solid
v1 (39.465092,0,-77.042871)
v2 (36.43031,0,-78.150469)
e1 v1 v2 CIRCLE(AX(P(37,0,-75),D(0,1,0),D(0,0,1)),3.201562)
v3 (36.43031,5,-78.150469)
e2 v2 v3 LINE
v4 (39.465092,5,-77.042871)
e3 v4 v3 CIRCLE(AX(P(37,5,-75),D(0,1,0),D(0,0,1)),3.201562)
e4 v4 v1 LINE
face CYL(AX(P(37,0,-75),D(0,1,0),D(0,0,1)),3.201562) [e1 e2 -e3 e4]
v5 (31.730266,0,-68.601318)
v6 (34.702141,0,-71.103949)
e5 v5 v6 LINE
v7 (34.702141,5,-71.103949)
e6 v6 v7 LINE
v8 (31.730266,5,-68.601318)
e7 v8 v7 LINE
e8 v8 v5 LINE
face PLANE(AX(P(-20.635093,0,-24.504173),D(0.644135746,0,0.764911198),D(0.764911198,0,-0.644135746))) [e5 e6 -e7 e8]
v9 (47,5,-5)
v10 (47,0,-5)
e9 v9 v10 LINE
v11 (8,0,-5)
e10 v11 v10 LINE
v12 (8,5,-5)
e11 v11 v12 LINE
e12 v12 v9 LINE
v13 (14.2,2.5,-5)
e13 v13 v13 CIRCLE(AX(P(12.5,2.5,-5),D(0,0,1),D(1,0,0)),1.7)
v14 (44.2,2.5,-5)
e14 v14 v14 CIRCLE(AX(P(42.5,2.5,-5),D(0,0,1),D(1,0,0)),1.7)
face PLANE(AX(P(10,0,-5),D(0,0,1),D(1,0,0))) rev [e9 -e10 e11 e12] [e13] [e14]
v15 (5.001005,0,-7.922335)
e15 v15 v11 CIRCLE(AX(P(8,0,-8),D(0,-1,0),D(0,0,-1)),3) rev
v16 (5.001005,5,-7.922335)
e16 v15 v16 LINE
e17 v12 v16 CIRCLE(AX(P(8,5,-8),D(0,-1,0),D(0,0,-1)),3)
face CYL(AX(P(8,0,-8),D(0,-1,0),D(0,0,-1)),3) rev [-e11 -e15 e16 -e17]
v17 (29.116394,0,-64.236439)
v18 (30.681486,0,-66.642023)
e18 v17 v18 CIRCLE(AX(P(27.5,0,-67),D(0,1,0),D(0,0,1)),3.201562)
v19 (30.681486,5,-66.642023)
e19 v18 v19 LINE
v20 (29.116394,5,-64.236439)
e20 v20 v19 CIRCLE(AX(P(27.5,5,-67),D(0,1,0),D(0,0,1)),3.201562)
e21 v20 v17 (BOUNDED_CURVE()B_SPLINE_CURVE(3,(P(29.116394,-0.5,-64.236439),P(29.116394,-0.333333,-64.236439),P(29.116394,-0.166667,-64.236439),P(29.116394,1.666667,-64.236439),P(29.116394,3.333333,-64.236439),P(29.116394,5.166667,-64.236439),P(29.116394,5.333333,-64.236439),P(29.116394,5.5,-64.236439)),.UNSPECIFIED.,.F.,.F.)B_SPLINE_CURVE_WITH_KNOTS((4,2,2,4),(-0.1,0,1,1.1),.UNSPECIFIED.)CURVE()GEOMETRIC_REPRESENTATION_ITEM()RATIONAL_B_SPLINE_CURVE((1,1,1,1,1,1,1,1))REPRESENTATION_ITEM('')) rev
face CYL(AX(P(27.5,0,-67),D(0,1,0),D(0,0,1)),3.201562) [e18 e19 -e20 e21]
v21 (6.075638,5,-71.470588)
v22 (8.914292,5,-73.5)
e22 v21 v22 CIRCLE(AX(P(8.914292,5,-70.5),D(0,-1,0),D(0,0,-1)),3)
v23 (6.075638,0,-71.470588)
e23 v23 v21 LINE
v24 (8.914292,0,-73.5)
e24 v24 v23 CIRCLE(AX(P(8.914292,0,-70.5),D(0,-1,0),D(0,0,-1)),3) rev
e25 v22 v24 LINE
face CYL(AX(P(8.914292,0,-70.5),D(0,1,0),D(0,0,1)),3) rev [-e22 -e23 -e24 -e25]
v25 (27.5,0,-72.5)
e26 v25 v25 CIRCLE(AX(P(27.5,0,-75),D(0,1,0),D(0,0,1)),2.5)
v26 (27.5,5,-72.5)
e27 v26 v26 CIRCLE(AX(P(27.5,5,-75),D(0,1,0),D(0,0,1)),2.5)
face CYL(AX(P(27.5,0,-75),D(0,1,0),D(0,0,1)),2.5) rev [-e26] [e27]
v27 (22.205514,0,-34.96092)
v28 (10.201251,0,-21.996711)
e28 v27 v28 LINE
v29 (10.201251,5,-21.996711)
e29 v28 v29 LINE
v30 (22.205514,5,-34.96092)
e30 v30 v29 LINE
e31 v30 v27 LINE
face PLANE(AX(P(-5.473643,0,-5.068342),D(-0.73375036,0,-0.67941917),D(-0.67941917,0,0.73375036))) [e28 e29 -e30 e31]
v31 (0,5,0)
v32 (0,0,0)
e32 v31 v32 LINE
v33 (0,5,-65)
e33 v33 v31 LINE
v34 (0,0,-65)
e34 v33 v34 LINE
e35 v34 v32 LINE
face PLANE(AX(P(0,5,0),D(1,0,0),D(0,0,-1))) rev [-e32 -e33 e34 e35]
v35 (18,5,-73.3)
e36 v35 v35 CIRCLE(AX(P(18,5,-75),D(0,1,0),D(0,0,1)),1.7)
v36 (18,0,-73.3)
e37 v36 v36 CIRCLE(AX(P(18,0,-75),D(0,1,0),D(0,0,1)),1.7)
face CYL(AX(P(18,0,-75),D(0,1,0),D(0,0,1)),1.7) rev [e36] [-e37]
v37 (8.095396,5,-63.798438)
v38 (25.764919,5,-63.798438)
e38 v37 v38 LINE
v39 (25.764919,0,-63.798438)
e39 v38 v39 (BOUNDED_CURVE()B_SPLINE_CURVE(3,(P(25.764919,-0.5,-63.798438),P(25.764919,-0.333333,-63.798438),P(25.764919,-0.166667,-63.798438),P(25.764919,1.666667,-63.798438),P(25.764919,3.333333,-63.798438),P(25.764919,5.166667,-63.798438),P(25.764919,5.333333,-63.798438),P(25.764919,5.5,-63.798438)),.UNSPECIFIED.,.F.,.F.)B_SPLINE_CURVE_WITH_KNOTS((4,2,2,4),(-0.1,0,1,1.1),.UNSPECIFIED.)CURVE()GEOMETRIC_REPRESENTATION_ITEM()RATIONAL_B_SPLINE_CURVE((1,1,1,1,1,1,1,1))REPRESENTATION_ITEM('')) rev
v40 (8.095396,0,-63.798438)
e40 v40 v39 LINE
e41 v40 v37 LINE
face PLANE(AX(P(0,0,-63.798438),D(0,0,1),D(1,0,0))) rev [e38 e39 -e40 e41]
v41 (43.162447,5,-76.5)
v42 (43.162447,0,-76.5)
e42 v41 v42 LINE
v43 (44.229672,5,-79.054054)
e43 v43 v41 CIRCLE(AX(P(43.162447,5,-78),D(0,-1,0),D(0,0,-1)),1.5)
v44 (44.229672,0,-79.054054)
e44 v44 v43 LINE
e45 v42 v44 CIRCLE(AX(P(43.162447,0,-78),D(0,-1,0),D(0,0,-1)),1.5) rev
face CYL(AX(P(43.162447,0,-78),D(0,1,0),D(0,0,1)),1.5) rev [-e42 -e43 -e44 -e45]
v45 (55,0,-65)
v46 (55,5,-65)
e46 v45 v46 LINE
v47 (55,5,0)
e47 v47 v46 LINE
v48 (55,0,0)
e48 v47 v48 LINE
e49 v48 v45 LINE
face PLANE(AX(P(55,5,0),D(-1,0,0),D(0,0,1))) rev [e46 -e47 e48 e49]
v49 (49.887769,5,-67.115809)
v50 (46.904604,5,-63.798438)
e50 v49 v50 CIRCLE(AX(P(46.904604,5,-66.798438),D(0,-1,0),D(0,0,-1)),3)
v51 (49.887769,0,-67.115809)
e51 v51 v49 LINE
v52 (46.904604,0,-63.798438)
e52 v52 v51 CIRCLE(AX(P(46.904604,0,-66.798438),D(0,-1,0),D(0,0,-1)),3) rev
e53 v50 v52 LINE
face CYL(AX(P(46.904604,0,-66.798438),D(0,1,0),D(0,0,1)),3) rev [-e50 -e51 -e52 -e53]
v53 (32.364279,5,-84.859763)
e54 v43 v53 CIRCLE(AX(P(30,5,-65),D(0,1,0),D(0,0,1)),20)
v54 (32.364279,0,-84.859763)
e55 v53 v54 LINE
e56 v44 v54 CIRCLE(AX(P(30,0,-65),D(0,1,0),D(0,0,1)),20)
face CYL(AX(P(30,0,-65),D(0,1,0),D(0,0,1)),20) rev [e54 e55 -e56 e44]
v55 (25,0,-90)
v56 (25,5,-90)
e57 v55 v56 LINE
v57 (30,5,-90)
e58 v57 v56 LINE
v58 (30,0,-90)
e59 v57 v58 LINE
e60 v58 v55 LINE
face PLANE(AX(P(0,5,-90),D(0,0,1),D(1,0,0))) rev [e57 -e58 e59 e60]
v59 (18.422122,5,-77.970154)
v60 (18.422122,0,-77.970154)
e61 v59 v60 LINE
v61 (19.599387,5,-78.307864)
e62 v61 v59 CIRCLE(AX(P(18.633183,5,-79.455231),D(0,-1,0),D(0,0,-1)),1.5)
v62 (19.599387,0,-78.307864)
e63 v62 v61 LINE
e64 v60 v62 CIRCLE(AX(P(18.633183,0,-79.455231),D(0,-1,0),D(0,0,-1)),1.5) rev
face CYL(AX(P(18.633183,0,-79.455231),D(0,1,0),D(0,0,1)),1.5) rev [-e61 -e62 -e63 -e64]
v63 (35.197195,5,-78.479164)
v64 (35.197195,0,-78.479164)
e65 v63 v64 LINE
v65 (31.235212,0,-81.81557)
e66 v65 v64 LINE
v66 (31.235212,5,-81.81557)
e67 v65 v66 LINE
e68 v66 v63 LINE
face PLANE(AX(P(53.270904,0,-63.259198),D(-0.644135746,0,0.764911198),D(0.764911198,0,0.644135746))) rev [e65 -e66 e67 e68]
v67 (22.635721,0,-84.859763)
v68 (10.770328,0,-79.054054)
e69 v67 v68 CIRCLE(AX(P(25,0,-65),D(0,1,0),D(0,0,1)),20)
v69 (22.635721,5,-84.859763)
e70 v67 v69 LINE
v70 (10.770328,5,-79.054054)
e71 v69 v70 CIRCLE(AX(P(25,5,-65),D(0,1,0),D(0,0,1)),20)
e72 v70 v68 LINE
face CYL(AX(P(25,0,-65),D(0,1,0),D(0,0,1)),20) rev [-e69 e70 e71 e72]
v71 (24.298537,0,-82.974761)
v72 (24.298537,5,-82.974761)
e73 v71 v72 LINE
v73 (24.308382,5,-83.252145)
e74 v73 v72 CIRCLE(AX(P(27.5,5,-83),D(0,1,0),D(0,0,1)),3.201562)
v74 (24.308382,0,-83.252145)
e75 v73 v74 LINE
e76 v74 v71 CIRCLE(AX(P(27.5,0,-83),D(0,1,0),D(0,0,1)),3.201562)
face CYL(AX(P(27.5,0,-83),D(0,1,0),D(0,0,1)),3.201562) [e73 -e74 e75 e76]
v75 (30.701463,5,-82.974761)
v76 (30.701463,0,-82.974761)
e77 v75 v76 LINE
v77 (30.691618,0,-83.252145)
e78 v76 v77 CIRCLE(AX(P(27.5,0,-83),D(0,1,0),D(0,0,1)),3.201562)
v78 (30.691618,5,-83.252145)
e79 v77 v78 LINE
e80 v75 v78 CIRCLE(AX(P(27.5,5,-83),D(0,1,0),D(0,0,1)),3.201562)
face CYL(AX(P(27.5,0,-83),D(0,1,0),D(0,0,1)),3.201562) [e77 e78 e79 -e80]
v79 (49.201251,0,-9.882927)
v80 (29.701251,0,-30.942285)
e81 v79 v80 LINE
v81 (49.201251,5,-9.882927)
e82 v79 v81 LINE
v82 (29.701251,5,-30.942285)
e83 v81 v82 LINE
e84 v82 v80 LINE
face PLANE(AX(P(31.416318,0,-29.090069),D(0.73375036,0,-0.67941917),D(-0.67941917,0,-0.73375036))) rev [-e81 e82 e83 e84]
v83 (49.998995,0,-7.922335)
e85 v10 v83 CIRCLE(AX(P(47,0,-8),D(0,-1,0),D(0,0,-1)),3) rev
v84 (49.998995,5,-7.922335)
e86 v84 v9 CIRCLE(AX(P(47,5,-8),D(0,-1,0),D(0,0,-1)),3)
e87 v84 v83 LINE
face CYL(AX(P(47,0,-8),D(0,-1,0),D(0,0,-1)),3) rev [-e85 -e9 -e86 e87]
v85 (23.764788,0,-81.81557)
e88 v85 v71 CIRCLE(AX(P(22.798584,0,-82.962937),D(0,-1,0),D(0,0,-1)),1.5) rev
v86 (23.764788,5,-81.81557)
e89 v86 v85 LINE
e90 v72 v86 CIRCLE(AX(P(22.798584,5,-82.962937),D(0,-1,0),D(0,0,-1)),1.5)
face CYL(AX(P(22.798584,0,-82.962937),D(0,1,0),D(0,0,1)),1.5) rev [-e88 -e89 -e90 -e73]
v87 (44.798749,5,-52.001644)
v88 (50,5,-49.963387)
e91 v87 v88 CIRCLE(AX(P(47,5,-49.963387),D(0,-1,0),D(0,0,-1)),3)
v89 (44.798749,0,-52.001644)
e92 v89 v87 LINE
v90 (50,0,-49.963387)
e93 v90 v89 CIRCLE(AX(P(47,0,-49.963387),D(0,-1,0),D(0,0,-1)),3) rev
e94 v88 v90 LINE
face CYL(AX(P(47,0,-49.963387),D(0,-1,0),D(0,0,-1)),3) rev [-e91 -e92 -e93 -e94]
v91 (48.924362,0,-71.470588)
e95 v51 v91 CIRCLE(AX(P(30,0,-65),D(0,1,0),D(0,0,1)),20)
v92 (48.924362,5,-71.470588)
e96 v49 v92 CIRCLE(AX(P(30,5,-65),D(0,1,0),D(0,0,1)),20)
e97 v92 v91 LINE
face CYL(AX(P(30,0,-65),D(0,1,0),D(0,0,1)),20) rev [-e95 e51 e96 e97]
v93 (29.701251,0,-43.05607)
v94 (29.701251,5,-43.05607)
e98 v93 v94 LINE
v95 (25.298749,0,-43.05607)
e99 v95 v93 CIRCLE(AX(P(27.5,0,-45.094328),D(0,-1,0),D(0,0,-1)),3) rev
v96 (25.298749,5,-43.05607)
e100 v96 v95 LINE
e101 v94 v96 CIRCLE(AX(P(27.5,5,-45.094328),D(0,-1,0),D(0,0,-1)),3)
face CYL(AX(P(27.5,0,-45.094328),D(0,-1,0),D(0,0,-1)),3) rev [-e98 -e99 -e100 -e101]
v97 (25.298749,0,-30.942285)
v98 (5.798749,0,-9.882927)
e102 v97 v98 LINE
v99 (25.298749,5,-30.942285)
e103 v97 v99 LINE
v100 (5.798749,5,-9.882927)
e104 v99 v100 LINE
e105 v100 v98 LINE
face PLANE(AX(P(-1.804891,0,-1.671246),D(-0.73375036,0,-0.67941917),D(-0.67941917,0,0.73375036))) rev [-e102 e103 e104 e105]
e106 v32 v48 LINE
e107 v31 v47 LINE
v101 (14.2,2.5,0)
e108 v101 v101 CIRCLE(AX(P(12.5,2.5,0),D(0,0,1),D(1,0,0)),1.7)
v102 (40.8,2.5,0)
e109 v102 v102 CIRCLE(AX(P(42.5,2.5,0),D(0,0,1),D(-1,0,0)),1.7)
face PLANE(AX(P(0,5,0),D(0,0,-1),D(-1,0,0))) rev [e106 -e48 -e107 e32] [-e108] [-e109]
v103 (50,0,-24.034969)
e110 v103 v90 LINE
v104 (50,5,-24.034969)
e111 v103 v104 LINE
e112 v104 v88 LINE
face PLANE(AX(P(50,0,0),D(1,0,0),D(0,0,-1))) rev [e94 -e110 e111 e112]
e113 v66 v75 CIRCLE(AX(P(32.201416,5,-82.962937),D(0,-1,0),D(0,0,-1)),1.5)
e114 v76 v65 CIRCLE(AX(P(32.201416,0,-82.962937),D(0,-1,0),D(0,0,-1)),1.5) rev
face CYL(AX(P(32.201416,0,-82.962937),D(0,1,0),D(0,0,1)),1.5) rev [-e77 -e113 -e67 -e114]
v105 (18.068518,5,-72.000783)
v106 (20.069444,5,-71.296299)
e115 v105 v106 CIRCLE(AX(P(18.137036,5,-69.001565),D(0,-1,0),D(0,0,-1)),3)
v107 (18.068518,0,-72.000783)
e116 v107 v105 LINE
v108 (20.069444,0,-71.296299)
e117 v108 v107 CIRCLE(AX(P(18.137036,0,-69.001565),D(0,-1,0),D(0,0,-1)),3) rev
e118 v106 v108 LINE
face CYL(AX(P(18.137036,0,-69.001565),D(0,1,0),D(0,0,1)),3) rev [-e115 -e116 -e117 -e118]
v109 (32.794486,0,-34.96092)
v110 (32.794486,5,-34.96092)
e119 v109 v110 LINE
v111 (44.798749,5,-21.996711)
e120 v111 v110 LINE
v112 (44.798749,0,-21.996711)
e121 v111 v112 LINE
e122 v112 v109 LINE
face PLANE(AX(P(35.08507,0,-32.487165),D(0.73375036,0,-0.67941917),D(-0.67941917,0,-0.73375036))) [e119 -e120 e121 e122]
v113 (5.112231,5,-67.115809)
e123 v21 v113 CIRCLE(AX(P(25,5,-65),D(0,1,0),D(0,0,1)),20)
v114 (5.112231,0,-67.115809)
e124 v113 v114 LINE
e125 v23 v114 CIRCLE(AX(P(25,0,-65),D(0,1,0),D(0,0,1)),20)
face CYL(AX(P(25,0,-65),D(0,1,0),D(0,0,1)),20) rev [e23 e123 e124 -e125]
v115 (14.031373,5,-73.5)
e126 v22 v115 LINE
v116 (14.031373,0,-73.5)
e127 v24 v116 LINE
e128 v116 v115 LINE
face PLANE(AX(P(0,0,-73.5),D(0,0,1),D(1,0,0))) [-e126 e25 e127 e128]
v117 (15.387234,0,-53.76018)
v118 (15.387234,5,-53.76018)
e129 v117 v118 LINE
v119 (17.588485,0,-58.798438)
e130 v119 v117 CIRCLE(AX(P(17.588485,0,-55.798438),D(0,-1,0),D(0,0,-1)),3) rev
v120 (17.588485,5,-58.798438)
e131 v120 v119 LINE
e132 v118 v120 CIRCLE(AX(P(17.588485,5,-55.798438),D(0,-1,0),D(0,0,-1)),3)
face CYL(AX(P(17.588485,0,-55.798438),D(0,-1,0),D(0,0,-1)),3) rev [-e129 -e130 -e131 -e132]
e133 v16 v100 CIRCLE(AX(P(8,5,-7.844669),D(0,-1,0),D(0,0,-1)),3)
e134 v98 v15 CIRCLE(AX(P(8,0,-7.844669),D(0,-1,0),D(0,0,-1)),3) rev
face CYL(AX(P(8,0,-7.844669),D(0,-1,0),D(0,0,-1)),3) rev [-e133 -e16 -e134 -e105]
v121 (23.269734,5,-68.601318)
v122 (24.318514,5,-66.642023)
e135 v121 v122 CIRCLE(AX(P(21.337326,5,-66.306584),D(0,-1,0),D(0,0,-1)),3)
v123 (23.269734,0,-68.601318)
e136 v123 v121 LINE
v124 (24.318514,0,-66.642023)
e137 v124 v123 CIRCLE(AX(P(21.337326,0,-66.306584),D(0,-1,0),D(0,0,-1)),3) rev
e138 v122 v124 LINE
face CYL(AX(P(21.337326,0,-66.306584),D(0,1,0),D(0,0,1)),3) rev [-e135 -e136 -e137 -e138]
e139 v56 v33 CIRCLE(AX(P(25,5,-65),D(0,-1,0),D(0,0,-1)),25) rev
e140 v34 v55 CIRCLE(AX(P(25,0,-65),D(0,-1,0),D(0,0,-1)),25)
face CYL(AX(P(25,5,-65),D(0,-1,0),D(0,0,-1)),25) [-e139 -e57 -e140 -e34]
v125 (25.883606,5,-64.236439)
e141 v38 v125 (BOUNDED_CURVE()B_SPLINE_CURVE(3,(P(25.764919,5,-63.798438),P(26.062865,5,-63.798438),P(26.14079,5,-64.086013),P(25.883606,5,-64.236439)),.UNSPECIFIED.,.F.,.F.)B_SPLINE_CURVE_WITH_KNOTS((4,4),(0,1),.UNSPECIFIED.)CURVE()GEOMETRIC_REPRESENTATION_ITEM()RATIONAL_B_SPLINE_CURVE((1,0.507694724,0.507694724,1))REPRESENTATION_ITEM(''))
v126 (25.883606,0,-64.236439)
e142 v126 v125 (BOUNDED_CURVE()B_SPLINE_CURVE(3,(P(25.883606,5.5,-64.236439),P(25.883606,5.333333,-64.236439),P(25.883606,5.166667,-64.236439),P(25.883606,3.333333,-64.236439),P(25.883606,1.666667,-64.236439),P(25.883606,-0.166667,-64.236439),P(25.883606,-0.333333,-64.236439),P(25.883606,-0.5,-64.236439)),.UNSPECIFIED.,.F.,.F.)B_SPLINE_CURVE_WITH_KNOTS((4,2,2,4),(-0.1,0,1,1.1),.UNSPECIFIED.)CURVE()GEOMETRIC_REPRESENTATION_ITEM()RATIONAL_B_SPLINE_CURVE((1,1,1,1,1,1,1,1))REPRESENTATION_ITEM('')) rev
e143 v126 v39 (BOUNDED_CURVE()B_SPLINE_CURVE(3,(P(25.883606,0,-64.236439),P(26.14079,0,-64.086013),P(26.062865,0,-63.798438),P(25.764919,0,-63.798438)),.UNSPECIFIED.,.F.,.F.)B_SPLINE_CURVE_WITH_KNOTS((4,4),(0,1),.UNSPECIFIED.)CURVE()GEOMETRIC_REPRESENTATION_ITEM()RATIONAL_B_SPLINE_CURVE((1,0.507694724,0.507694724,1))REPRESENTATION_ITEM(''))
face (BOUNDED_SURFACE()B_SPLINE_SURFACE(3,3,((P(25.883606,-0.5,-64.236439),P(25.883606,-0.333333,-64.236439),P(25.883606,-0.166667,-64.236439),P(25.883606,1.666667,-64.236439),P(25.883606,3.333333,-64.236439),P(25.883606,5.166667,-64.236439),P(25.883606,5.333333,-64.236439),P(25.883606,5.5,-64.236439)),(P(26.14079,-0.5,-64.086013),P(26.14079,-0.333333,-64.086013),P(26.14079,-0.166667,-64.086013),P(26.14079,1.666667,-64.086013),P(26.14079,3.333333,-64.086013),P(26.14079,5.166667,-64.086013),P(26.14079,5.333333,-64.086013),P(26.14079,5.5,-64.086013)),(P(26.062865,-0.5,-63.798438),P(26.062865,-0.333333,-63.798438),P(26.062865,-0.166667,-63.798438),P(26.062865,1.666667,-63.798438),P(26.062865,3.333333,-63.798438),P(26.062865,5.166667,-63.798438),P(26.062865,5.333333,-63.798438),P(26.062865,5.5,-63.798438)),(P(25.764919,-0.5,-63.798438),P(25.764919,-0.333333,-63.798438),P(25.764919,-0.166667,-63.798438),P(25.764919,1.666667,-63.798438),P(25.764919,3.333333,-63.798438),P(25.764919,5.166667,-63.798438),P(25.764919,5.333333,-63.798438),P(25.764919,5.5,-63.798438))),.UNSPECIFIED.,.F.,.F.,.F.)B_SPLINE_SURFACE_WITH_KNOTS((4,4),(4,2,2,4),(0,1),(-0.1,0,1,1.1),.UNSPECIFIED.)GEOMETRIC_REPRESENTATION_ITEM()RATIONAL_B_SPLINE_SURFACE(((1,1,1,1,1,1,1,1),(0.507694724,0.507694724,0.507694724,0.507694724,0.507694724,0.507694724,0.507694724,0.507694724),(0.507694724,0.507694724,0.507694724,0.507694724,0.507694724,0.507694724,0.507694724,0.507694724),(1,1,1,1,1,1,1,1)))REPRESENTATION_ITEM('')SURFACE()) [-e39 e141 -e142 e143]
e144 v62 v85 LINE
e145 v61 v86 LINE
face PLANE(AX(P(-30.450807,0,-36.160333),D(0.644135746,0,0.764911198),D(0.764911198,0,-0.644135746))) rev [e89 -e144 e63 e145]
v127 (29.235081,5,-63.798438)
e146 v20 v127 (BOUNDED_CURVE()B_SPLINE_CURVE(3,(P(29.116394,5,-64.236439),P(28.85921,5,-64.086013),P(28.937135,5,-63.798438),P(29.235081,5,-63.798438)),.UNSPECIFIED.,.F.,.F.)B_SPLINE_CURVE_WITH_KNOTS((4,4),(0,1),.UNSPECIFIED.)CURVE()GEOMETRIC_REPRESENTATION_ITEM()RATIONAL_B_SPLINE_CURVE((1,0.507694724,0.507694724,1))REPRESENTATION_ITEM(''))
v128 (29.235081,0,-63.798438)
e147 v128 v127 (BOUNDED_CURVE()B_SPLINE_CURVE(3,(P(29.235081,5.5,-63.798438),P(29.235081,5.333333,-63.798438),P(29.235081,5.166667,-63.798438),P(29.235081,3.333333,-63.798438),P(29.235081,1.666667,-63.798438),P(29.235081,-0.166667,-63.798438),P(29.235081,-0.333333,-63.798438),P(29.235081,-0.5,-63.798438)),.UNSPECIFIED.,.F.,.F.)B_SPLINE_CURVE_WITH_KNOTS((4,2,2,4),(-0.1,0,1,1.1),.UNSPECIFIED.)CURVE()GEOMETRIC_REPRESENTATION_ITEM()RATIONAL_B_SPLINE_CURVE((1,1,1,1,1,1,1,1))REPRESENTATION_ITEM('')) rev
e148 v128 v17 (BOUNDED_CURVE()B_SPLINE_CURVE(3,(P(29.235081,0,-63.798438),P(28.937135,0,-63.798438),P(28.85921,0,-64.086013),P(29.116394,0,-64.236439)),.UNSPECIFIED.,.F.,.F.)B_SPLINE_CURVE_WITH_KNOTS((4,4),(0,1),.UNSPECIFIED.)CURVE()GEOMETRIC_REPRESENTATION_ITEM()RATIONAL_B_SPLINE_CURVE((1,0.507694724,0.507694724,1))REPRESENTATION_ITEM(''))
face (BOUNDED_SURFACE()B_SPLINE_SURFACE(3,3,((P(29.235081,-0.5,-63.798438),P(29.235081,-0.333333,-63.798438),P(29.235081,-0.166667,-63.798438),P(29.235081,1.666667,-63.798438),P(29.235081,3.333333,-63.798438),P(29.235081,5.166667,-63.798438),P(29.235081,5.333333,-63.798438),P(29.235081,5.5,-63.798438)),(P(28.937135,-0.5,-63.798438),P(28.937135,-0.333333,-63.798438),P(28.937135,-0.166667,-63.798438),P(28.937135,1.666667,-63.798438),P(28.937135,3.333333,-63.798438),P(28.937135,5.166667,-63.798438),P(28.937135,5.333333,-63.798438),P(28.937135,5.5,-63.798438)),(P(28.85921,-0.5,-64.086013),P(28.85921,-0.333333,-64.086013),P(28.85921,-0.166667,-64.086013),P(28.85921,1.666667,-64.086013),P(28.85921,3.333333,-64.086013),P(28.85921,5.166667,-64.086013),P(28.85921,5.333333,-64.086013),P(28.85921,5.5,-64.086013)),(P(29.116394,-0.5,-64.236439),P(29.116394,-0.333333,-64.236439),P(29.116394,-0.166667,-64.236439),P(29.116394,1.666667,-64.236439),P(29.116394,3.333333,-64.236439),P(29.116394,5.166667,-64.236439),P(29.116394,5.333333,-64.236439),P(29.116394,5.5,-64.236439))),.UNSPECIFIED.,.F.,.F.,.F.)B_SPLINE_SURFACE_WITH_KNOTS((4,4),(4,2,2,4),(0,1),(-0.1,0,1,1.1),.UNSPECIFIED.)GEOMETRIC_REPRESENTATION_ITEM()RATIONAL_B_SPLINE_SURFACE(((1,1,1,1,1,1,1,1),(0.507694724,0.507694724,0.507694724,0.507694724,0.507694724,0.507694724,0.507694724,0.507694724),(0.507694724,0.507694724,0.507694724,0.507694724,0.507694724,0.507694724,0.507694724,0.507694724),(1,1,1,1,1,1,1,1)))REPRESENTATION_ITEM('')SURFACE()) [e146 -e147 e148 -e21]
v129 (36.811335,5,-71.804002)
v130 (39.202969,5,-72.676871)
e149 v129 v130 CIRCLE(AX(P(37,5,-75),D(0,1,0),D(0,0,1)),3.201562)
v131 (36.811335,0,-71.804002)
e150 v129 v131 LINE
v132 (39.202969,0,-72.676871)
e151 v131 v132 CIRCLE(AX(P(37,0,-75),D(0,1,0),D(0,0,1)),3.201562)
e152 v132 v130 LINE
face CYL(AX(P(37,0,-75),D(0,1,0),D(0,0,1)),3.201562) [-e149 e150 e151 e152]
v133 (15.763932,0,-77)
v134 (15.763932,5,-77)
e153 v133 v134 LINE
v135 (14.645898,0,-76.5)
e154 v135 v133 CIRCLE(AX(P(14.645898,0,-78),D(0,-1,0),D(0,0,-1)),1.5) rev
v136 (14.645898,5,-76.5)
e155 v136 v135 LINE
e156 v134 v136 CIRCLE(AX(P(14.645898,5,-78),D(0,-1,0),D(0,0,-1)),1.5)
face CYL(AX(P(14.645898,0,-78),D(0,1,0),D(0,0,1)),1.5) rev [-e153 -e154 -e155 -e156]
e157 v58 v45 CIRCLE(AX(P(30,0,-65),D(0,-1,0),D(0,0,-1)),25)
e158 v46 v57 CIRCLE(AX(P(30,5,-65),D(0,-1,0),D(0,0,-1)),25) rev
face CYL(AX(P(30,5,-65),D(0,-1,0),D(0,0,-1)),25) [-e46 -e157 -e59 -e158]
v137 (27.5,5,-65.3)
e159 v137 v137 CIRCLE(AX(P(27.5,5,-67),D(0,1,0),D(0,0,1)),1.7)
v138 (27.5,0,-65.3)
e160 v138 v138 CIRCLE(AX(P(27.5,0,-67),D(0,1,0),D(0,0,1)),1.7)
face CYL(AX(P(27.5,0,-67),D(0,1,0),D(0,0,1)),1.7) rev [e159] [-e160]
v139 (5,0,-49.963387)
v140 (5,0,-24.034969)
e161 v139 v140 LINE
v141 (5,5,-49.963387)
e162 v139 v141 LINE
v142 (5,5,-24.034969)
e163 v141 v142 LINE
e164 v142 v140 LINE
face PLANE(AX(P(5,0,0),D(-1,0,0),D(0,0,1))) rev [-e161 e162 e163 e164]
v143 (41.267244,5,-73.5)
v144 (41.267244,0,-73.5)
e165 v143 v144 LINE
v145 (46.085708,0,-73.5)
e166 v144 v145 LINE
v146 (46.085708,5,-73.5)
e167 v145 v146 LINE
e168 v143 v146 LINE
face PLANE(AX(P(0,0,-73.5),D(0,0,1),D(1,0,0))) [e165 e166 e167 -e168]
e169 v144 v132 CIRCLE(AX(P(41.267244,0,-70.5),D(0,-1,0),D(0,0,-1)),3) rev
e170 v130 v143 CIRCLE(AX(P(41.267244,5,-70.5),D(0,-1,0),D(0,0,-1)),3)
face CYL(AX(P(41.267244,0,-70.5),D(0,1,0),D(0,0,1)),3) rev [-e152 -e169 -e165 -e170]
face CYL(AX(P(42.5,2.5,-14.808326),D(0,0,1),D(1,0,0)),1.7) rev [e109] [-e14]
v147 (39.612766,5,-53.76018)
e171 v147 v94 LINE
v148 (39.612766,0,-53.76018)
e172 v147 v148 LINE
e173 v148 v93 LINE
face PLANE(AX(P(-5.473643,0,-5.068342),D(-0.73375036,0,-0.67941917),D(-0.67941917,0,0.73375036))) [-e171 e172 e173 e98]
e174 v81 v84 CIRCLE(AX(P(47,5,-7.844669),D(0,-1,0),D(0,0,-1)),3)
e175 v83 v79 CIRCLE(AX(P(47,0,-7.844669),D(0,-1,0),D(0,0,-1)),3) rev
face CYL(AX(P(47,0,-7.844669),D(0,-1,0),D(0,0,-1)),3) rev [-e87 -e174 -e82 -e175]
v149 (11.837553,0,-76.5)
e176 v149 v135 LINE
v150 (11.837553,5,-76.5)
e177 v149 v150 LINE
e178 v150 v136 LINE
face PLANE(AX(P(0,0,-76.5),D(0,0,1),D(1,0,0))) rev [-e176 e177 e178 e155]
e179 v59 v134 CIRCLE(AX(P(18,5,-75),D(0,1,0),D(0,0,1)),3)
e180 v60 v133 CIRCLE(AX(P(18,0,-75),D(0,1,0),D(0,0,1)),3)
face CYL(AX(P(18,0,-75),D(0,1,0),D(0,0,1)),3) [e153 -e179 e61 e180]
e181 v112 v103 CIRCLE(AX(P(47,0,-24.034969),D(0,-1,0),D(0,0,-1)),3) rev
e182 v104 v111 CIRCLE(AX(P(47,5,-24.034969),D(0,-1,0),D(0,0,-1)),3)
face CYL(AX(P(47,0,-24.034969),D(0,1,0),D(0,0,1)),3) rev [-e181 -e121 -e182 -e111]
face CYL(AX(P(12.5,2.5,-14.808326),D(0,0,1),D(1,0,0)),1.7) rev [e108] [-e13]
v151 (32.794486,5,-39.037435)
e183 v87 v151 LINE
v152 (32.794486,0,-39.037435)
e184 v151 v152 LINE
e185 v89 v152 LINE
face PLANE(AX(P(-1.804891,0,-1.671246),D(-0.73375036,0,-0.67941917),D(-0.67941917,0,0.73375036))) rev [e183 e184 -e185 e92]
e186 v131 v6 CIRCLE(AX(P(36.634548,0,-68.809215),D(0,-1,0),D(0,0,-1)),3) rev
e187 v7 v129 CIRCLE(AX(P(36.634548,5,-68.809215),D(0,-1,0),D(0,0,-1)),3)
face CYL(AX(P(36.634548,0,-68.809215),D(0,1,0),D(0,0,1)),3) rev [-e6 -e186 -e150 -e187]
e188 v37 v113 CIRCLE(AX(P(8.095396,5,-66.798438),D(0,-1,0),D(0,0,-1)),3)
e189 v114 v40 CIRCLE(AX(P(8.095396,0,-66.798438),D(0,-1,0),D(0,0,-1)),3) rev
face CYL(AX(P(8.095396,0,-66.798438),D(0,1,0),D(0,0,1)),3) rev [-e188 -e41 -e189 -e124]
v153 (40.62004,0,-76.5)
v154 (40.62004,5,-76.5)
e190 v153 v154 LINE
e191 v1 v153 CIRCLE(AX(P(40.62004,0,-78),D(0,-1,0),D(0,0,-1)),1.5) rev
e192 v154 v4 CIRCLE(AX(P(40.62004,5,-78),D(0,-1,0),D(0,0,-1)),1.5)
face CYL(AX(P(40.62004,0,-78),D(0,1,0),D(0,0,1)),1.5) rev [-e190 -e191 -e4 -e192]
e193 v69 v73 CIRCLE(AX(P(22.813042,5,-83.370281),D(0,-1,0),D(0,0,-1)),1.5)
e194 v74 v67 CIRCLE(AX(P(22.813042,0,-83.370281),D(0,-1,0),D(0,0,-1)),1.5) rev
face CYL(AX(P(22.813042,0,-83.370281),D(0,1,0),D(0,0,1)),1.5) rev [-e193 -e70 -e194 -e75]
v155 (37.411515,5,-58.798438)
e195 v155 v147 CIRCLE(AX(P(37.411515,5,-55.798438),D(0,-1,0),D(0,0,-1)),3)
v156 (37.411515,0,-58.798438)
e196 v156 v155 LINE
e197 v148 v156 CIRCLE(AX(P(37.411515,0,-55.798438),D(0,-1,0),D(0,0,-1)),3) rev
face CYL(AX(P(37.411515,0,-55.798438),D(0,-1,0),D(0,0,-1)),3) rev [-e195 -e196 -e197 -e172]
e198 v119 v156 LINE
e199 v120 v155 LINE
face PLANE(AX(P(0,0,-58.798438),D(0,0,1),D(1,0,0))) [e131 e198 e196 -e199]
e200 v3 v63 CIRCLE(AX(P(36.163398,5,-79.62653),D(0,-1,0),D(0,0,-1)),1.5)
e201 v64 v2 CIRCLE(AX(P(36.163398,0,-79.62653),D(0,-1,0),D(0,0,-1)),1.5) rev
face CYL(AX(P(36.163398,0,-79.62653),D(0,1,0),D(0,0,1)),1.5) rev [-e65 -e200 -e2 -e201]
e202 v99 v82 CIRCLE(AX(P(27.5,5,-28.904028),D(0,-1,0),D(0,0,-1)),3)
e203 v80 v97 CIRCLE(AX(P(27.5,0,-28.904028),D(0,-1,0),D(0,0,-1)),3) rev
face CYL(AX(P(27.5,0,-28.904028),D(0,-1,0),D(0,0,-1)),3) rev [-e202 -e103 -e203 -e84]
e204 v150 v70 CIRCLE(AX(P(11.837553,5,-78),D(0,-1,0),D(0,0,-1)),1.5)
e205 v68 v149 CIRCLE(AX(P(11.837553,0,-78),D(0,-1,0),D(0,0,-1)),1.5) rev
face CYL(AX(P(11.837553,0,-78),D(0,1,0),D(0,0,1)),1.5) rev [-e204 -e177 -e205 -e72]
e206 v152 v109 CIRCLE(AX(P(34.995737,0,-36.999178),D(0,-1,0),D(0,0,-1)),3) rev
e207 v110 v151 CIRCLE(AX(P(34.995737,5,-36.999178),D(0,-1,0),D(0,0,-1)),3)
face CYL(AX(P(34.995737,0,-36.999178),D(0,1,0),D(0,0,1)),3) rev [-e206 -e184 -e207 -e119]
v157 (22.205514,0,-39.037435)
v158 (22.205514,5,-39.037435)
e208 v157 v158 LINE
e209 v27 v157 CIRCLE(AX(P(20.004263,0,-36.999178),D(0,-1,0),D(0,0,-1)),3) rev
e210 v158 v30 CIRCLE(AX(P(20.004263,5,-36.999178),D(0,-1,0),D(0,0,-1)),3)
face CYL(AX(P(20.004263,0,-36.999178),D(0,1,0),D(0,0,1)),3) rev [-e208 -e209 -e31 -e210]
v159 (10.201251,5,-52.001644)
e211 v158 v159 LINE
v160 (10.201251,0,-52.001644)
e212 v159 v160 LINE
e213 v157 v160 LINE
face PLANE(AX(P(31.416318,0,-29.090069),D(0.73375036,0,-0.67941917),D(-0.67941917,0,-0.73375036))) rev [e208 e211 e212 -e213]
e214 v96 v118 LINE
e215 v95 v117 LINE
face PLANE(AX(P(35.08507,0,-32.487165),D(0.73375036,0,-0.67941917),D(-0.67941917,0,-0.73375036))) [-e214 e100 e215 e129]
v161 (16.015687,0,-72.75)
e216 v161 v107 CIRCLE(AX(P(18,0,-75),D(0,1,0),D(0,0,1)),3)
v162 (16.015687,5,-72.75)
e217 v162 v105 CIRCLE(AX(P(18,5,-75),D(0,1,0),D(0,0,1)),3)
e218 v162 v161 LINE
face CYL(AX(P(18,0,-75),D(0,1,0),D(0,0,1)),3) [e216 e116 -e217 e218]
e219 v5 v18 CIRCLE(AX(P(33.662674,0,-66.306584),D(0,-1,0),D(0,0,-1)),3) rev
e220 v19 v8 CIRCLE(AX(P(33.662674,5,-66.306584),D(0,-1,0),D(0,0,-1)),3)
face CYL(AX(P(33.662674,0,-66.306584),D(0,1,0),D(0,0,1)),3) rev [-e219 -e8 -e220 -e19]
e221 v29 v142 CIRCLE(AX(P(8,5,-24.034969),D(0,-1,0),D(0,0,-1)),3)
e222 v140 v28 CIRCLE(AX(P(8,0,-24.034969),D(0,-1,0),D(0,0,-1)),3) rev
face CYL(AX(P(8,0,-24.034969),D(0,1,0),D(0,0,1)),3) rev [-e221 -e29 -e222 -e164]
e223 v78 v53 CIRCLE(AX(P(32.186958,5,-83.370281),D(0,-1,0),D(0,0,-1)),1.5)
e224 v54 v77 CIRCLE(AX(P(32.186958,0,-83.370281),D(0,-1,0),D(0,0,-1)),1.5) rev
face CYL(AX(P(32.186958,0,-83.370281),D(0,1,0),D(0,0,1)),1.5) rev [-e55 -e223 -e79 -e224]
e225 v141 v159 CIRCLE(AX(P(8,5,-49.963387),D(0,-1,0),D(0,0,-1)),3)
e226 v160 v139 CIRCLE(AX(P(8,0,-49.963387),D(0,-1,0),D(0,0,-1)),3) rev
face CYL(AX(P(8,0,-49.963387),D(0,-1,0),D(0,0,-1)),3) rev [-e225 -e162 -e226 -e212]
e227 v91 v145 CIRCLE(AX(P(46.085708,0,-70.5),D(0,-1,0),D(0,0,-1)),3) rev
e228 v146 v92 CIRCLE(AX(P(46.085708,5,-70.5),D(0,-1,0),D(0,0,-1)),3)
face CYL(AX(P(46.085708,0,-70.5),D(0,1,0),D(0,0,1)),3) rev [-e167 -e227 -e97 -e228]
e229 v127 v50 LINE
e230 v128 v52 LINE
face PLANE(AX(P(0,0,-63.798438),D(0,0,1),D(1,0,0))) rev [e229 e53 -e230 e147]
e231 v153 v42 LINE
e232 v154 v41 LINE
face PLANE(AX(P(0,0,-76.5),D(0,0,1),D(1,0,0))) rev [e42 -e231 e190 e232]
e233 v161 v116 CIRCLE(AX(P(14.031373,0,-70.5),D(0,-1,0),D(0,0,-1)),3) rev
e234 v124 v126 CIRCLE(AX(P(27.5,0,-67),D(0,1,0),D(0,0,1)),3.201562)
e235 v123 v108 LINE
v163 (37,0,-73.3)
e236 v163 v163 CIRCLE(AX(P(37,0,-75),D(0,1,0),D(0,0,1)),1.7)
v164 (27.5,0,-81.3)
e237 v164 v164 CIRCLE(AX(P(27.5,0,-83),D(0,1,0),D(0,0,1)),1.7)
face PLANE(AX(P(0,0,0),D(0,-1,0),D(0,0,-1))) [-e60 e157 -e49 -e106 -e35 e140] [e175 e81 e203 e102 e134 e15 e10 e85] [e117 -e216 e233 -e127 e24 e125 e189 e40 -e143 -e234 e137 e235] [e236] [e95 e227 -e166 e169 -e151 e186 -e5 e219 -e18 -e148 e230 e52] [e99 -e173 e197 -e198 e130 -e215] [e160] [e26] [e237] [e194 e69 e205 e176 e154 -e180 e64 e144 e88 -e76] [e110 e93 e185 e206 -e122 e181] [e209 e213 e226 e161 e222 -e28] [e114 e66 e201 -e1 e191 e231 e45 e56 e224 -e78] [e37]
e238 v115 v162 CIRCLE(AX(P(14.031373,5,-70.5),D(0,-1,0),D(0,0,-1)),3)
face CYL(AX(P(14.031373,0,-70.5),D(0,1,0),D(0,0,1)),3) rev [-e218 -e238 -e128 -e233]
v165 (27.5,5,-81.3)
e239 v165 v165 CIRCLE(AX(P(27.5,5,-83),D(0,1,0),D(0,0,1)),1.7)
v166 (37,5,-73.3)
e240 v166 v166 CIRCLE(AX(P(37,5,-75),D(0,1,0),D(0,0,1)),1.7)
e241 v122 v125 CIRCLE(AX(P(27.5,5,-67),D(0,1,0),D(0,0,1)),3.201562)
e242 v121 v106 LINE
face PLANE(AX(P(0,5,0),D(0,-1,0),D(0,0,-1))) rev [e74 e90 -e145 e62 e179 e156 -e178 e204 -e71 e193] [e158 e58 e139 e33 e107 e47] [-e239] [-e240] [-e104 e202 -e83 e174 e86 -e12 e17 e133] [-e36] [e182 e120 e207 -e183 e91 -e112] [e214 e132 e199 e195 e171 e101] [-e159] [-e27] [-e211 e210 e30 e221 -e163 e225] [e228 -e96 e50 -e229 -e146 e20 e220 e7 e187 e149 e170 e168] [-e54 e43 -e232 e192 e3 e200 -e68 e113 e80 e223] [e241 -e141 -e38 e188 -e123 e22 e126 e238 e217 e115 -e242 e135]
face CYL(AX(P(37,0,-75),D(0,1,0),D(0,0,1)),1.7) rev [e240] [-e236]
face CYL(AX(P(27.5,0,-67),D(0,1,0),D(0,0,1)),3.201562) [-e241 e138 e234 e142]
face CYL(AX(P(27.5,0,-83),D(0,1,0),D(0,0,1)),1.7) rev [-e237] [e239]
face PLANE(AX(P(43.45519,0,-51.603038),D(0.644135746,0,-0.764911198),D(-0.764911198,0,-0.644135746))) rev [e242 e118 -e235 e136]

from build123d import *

# Parameters (mm, degrees)
SKETCH1_W           = 55.00000000000001
SKETCH1_H           = 90
BOSS_EXTRUDE1_DEPTH = 5
SKETCH2_R           = 2.499999999999999
SKETCH2_R_2         = 1.7000000000000015
CUT_EXTRUDE1_DEPTH  = 5
CUT_EXTRUDE2_DEPTH  = 5
SKETCH4_R           = 1.6999999999999995
CUT_EXTRUDE3_DEPTH  = 10
FILLET1_R           = 25
CUT_EXTRUDE4_DEPTH  = 5
FILLET2_R           = 3
FILLET3_R           = 1.5
FILLET4_DEPTH       = 5
FILLET5_DEPTH       = 5


with BuildPart() as part:
    # Sketch1 → Boss-Extrude1 (new body)
    with BuildSketch(Plane(origin=(0, 0, 0), x_dir=(1, 0, 0), z_dir=(0, 1, 0))):
        with Locations((27.500000000000004, 45)):
            Rectangle(SKETCH1_W, SKETCH1_H)
    extrude(amount=BOSS_EXTRUDE1_DEPTH)

    # Sketch2 → Cut-Extrude1 (cut)
    with BuildSketch(Plane(origin=(0, 5, 0), x_dir=(1, 0, 0), z_dir=(0, 1, 0))):
        with Locations(Location((27.5, 75, 0), (0, 0, 270))):
            Circle(SKETCH2_R)
        with Locations(Location((27.5, 83, 0), (0, 0, 270))):
            Circle(SKETCH2_R_2)
        with Locations(Location((27.5, 66.99999999999999, 0), (0, 0, 270))):
            Circle(SKETCH2_R_2)
        with Locations(Location((18.000000000000004, 75, 0), (0, 0, 270))):
            Circle(SKETCH2_R_2)
        with Locations(Location((37, 75, 0), (0, 0, 270))):
            Circle(SKETCH2_R_2)
    extrude(amount=-CUT_EXTRUDE1_DEPTH, mode=Mode.SUBTRACT)

    # Sketch3 → Cut-Extrude2 (cut)
    with BuildSketch(Plane(origin=(0, 5, 0), x_dir=(1, 0, 0), z_dir=(0, 1, 0))):
        with BuildLine():
            Line((10.000000000000012, 10), (15.00000000000001, 10.000000000000002))
            ThreePointArc((15.00000000000001, 10.000000000000002), (17.50000000000001, 7.500000000000004), (15.000000000000012, 5.000000000000005))
            Line((15.000000000000012, 5.000000000000005), (10.000000000000012, 5.000000000000004))
            ThreePointArc((10.000000000000012, 5.000000000000004), (7.500000000000015, 7.500000000000003), (10.000000000000012, 10))
        make_face()
        with BuildLine():
            Line((44.999999999999986, 10.000000000000055), (39.99999999999999, 10.000000000000057))
            ThreePointArc((39.99999999999999, 10.000000000000057), (37.499999999999986, 7.500000000000061), (39.999999999999986, 5.00000000000006))
            Line((39.999999999999986, 5.00000000000006), (44.999999999999986, 5.00000000000006))
            ThreePointArc((44.999999999999986, 5.00000000000006), (47.499999999999986, 7.500000000000058), (44.999999999999986, 10.000000000000055))
        make_face()
    extrude(amount=-CUT_EXTRUDE2_DEPTH, mode=Mode.SUBTRACT)

    # Sketch4 → Cut-Extrude3 (cut)
    with BuildSketch(Plane.XY):
        with Locations((12.5, 2.5)):
            Circle(SKETCH4_R)
        with Locations((42.49999999999999, 2.5)):
            Circle(SKETCH4_R)
    extrude(amount=-CUT_EXTRUDE3_DEPTH, mode=Mode.SUBTRACT)

    # Fillet1
    fillet1_edges = [part.edges().sort_by_distance(p)[0] for p in [
        (0, 2.5, -90),
        (55, 2.5, -90),
    ]]
    fillet(fillet1_edges, radius=FILLET1_R)

    # Sketch5 → Cut-Extrude4 (cut)
    with BuildSketch(Plane(origin=(0, 5, 0), x_dir=(1, 0, 0), z_dir=(0, 1, 0))):
        with BuildLine():
            ThreePointArc((30.000000000000004, 84.99999999999999), (30.616351748042604, 83.73372459579312), (30.629699199450542, 82.32547578178497))
            Line((30.629699199450524, 82.32547578178496), (35.80270803789781, 77.9692578125662))
            ThreePointArc((35.802708037897816, 77.96925781256621), (38.09764753434343, 78.00751889276688), (39.82842712474622, 76.49999999999993))
            Line((39.82842712474624, 76.49999999999999), (46.363068171954, 76.49999999999999))
            ThreePointArc((46.363068171953856, 76.49999999999959), (39.21954445729311, 82.74823934929873), (30.000000000000004, 84.99999999999999))
        make_face()
        with BuildLine():
            Line((19.021093968951536, 77.82088055517613), (24.370300800549494, 82.32547578178495))
            ThreePointArc((24.37030080054947, 82.32547578178496), (24.383648251957403, 83.7337245957931), (25.000000000000004, 84.99999999999999))
            ThreePointArc((25, 84.99999999999999), (15.780455542706903, 82.74823934929873), (8.636931828046162, 76.49999999999959))
            Line((8.63693182804602, 76.49999999999999), (15.40192378864667, 76.49999999999999))
            ThreePointArc((15.40192378864667, 76.49999999999997), (16.971457532003043, 77.81817323660678), (19.021093968951533, 77.82088055517613))
        make_face()
        with BuildLine():
            ThreePointArc((50, 64.99999999999997), (49.52021183036496, 69.35446094226141), (48.10386699023197, 73.49999999999936))
            Line((48.103866990232184, 73.50000000000001), (39.82842712474624, 73.50000000000001))
            ThreePointArc((39.82842712474622, 73.50000000000007), (38.09764753434344, 71.99248110723312), (35.80270803789783, 72.03074218743379))
            Line((35.80270803789782, 72.0307421874338), (30.629699199450528, 67.67452421821504))
            ThreePointArc((30.629699199450535, 67.67452421821503), (30.402791018509024, 65.64951701126475), (28.99999999999998, 64.1715728752538))
            Line((29.000000000000004, 64.17157287525379), (29.000000000000004, 63.79843788128356))
            Line((29.000000000000004, 63.79843788128356), (50, 63.79843788128356))
            Line((50, 63.79843788128356), (50, 64.99999999999997))
        make_face()
        with BuildLine():
            ThreePointArc((19.021093968951497, 72.17911944482385), (16.971457532003026, 72.18182676339323), (15.40192378864667, 73.50000000000003))
            Line((15.40192378864667, 73.50000000000001), (6.89613300976783, 73.50000000000001))
            ThreePointArc((6.89613300976804, 73.49999999999936), (5.479788169635057, 69.35446094226141), (5.000000000000007, 64.99999999999997))
            Line((5.000000000000004, 64.99999999999997), (5.000000000000004, 63.79843788128356))
            Line((5.000000000000004, 63.79843788128356), (26.000000000000004, 63.79843788128356))
            Line((26.000000000000004, 63.79843788128356), (26.000000000000004, 64.17157287525377))
            ThreePointArc((26.00000000000005, 64.17157287525379), (24.59720898149099, 65.64951701126472), (24.37030080054947, 67.67452421821501))
            Line((24.37030080054949, 67.67452421821503), (19.0210939689515, 72.17911944482385))
        make_face()
        Polygon((27.50000000000002, 40.67879140383743), (44.277961342029805, 58.798437881283576), (10.722038657970216, 58.79843788128357), align=None)
        Polygon((50, 16.37953135480838), (50, 57.61882430970066), (30.907153353376447, 36.999177832254524), align=None)
        Polygon((24.09284664662358, 36.999177832254496), (5.000000000000021, 57.61882430970065), (5.000000000000001, 16.379531354808364), align=None)
        Polygon((50, 5), (50, 9.020304211642536), (27.500000000000004, 33.3195642606716), (5.000000000000028, 9.020304211642582), (5, 5), align=None)
    extrude(amount=-CUT_EXTRUDE4_DEPTH, mode=Mode.SUBTRACT)

    # Fillet2
    # the kernel refuses this fillet: 3 mm, written as the material it adds along each edge
    with BuildSketch(Plane(origin=(30.62969919945053, 5, -67.67452421821503), x_dir=(0.7649111981170442, 0, -0.6441357457827876), z_dir=(0, -1, 0))) as fillet2_piece_1:
        with BuildLine():
            CenterArc((1.4388170342279112, 3), FILLET2_R, 226.52075102631792, 43.47924897368284)
            ThreePointArc((-0.6254584228035264, 0.823129117862604), (-0.2792858227831543, 0.43697667064582524), (0, 0))
            Line((0, 0), (1.4388170342279505, 4e-17))
        make_face()
    extrude(amount=5)
    with BuildSketch(Plane(origin=(35.80270803789783, 5, -72.03074218743379), x_dir=(0.9756512801214835, 0, 0.21932756232929423), z_dir=(0, -1, 0))) as fillet2_piece_2:
        with BuildLine():
            CenterArc((1.5181554182088943, 2.960641583195651), FILLET2_R, 217.22955187796006, 43.47924897368256)
            Line((-0.8704985020702118, 1.1456119831242833), (0, 0))
            ThreePointArc((0, 0), (0.5168993575467952, 0.04200280543114734), (1.0337987150935795, 0))
        make_face()
    extrude(amount=5)
    with BuildSketch(Plane(origin=(39.82842712474623, 5, -73.50000000000004), x_dir=(1, 0, 1.975e-14), z_dir=(0, -1, 0))) as fillet2_piece_3:
        with BuildLine():
            CenterArc((1.4388170342279547, 3), FILLET2_R, 226.5207510263163, 43.47924897368256)
            ThreePointArc((-0.6254584228035449, 0.8231291178626615), (-0.27928582278316433, 0.43697667064583906), (0, 0))
            Line((0, 0), (1.4388170342278954, 0))
        make_face()
    extrude(amount=5)
    with BuildSketch(Plane(origin=(48.10386699023208, 5, -73.49999999999969), x_dir=(-1, 0, -1.6195e-13), z_dir=(0, -1, 0))) as fillet2_piece_4:
        with BuildLine():
            CenterArc((2.018159048086173, -3), FILLET2_R, 89.99999999999072, 71.12349636944082)
            ThreePointArc((-0.8204952946452142, -2.0294117647054244), (-0.4380333665326992, -1.0034720596920297), (0, 0))
            Line((0, 0), (2.018159048086659, 0))
        make_face()
    extrude(amount=5)
    with BuildSketch(Plane(origin=(50, 5, -63.79843788128356), x_dir=(-1, 0, 0), z_dir=(0, -1, 0))) as fillet2_piece_5:
        with BuildLine():
            CenterArc((3.0953964498671382, 3), FILLET2_R, 173.9272895495291, 96.07271045047094)
            Line((0.11223111749075088, 3.317371390814756), (-0.18608541574688786, 3.3491085298962275))
            ThreePointArc((-0.18608541574688786, 3.3491085298962275), (-0.29999999999999716, 1.20156211871641), (-0.29999999999999716, 0))
            Line((-0.29999999999999716, 0), (0, -0.29999999999999716))
            Line((0, -0.29999999999999716), (3.0953964498671382, -0.29999999999999716))
            Line((3.0953964498671382, -0.29999999999999716), (3.0953964498671382, 0))
        make_face()
    extrude(amount=5)
    with BuildSketch(Plane(origin=(24.37030080054948, 5, -67.67452421821503), x_dir=(-0.76491119811705, 0, -0.6441357457827805), z_dir=(0, -1, 0))) as fillet2_piece_6:
        with BuildLine():
            CenterArc((1.4388170342279347, -3.0000000000000018), FILLET2_R, 89.99999999999983, 43.47924897368253)
            ThreePointArc((-0.6254584228035133, -0.8231291178626141), (-0.27928582278314756, -0.43697667064583), (0, 0))
            Line((0, 0), (1.4388170342279438, -1e-17))
        make_face()
    extrude(amount=5)
    with BuildSketch(Plane(origin=(19.021093968951497, 5, -72.17911944482385), x_dir=(0.7649111981170513, 0, 0.644135745782779), z_dir=(0, -1, 0))) as fillet2_piece_7:
        with BuildLine():
            CenterArc((1.3705507552437566, 3.0000000000000018), FILLET2_R, 228.59037789072798, 41.409622109271936)
            ThreePointArc((-0.6137627280547322, 0.7500000000000423), (-0.27639603776938276, 0.39994767601300885), (0, 0))
            Line((0, 0), (1.3705507552437535, -3e-17))
        make_face()
    extrude(amount=5)
    with BuildSketch(Plane(origin=(15.401923788646672, 5, -73.50000000000003), x_dir=(0.6333158920043296, 0, 0.7738933911946531), z_dir=(0, -1, 0))) as fillet2_piece_8:
        with BuildLine():
            CenterArc((1.4536885994895705, 2.96060784779286), FILLET2_R, 219.29518894536204, 41.409622109273414)
            Line((-0.8679915740944324, 1.0606601717799247), (0, 0))
            ThreePointArc((0, 0), (0.4845628664965213, 0.03939215220713661), (0.9691257329930376, -6e-17))
        make_face()
    extrude(amount=5)
    with BuildSketch(Plane(origin=(6.896133009767933, 5, -73.49999999999969), x_dir=(1, 0, -1.6195e-13), z_dir=(0, -1, 0))) as fillet2_piece_9:
        with BuildLine():
            CenterArc((2.0181590480861766, 3), FILLET2_R, 198.87650363056818, 71.12349636944111)
            ThreePointArc((-0.8204952946452142, 2.0294117647054386), (-0.43803336653269564, 1.0034720596920155), (0, 0))
            Line((0, 0), (2.0181590480866625, 0))
        make_face()
    extrude(amount=5)
    with BuildSketch(Plane(origin=(5.000000000000004, 5, -63.79843788128356), x_dir=(0.03381199502885917, 0, -0.9994282110247681), z_dir=(0, -1, 0))) as fillet2_piece_10:
        with BuildLine():
            CenterArc((3.1029461624495607, 2.9921905512165696), FILLET2_R, 178.06234606412994, 96.0727104504706)
            Line((0.10466152937525638, 3.0936265363031437), (-0.1951669339321712, 3.103770134811801))
            Line((-0.1951669339321712, 3.103770134811801), (-0.2998284633074276, 0.01014359850865765))
            Line((-0.2998284633074276, 0.01014359850865765), (-0.01014359850865774, -0.29982846330743024))
            ThreePointArc((-0.01014359850865774, -0.29982846330743024), (1.190731480235214, -0.3404556756923323), (3.340901627409787, -0.299219055121657))
            Line((3.340901627409787, -0.299219055121657), (3.3192693124134056, 0))
        make_face()
    extrude(amount=5)
    with BuildSketch(Plane(origin=(50, 5, -5), x_dir=(0, 0, -1), z_dir=(0, -1, 0))) as fillet2_piece_11:
        with BuildLine():
            CenterArc((FILLET2_R, -FILLET2_R), FILLET2_R, 90, 90)
            Line((0, -FILLET2_R), (0, 0))
            Line((0, 0), (FILLET2_R, 0))
        make_face()
    extrude(amount=5)
    with BuildSketch(Plane(origin=(50, 5, -9.020304211642536), x_dir=(0, 0, 1), z_dir=(0, -1, 0))) as fillet2_piece_12:
        with BuildLine():
            CenterArc((FILLET2_R * 0.391878315343, FILLET2_R), FILLET2_R, 227.20172837753046, 42.79827162246954)
            Line((-FILLET2_R * 0.287540855003, FILLET2_R * 0.266249639887), (0, 0))
            Line((0, 0), (FILLET2_R * 0.391878315343, 0))
        make_face()
    extrude(amount=5)
    with BuildSketch(Plane(origin=(5, 5, -5), x_dir=(0, 0, -1), z_dir=(0, -1, 0))) as fillet2_piece_13:
        with BuildLine():
            CenterArc((FILLET2_R, FILLET2_R), FILLET2_R, 180, 90)
            Line((0, FILLET2_R), (0, 0))
            Line((0, 0), (FILLET2_R, 0))
        make_face()
    extrude(amount=5)
    with BuildSketch(Plane(origin=(5.000000000000014, 5, -9.020304211642575), x_dir=(0.6794191703463476, 0, -0.7337503601129478), z_dir=(0, -1, 0))) as fillet2_piece_14:
        with BuildLine():
            CenterArc((FILLET2_R * 0.391878315343, FILLET2_R), FILLET2_R, 227.20172837753026, 42.798271622469485)
            Line((-FILLET2_R * 0.287540855003, FILLET2_R * 0.266249639887), (0, 0))
            Line((0, 0), (FILLET2_R * 0.391878315343, -2e-17))
        make_face()
    extrude(amount=5)
    with BuildSketch(Plane(origin=(27.500000000000007, 5, -33.319564260671605), x_dir=(0.6794191703463425, 0, 0.7337503601129526), z_dir=(0, -1, 0))) as fillet2_piece_15:
        with BuildLine():
            CenterArc((FILLET2_R * 1.07996711329, FILLET2_R), FILLET2_R, 175.59654324493897, 94.40345675506092)
            Line((FILLET2_R * 0.0829189914716, FILLET2_R * 1.07677918193), (0, 0))
            Line((0, 0), (FILLET2_R * 1.07996711329, -2e-17))
        make_face()
    extrude(amount=5)
    with BuildSketch(Plane(origin=(5.000000000000011, 5, -16.379531354808368), x_dir=(-1.16e-15, 0, -1), z_dir=(0, -1, 0))) as fillet2_piece_16:
        with BuildLine():
            CenterArc((FILLET2_R * 2.55181254192, FILLET2_R), FILLET2_R, 132.79827162246937, 137.20172837753069)
            Line((FILLET2_R * 1.87239337158, FILLET2_R * 1.73375036011), (0, 0))
            Line((0, 0), (FILLET2_R * 2.55181254192, 0))
        make_face()
    extrude(amount=5)
    with BuildSketch(Plane(origin=(50, 5, -16.37953135480838), x_dir=(0, 0, -1), z_dir=(0, -1, 0))) as fillet2_piece_17:
        with BuildLine():
            CenterArc((FILLET2_R * 2.55181254192, -FILLET2_R), FILLET2_R, 90, 137.20172837753046)
            Line((FILLET2_R * 1.87239337158, -FILLET2_R * 1.73375036011), (0, 0))
            Line((0, 0), (FILLET2_R * 2.55181254192, 0))
        make_face()
    extrude(amount=5)
    with BuildSketch(Plane(origin=(30.907153353376444, 5, -36.99917783225452), x_dir=(0.6794191703463437, 0, -0.7337503601129515), z_dir=(0, -1, 0))) as fillet2_piece_18:
        with BuildLine():
            CenterArc((FILLET2_R * 0.925954121838, FILLET2_R), FILLET2_R, 184.40345675506106, 85.59654324493908)
            Line((-FILLET2_R * 0.071093999981, FILLET2_R * 0.923220818068), (0, 0))
            Line((0, 0), (FILLET2_R * 0.925954121838, 4e-17))
        make_face()
    extrude(amount=5)
    with BuildSketch(Plane(origin=(50, 5, -57.61882430970066), x_dir=(0, 0, 1), z_dir=(0, -1, 0))) as fillet2_piece_19:
        with BuildLine():
            CenterArc((FILLET2_R * 2.55181254192, FILLET2_R), FILLET2_R, 132.79827162246934, 137.20172837753066)
            Line((FILLET2_R * 1.87239337158, FILLET2_R * 1.73375036011), (0, 0))
            Line((0, 0), (FILLET2_R * 2.55181254192, 0))
        make_face()
    extrude(amount=5)
    with BuildSketch(Plane(origin=(24.092846646623578, 5, -36.9991778322545), x_dir=(-0.6794191703463445, 0, -0.7337503601129507), z_dir=(0, -1, 0))) as fillet2_piece_20:
        with BuildLine():
            CenterArc((FILLET2_R * 0.925954121838, -FILLET2_R), FILLET2_R, 90, 85.5965432449388)
            Line((-FILLET2_R * 0.071093999981, -FILLET2_R * 0.923220818068), (0, 0))
            Line((0, 0), (FILLET2_R * 0.925954121838, 1.5e-16))
        make_face()
    extrude(amount=5)
    with BuildSketch(Plane(origin=(5.000000000000012, 5, -57.618824309700656), x_dir=(0.6794191703463444, 0, 0.7337503601129509), z_dir=(0, -1, 0))) as fillet2_piece_21:
        with BuildLine():
            CenterArc((FILLET2_R * 2.55181254192, FILLET2_R), FILLET2_R, 132.79827162246934, 137.2017283775306)
            Line((FILLET2_R * 1.87239337158, FILLET2_R * 1.73375036011), (0, 0))
            Line((0, 0), (FILLET2_R * 2.55181254192, 7e-17))
        make_face()
    extrude(amount=5)
    with BuildSketch(Plane(origin=(27.500000000000014, 5, -40.67879140383742), x_dir=(-0.6794191703463448, 0, -0.7337503601129505), z_dir=(0, -1, 0))) as fillet2_piece_22:
        with BuildLine():
            CenterArc((FILLET2_R * 1.07996711329, FILLET2_R), FILLET2_R, 175.59654324493903, 94.40345675506097)
            Line((FILLET2_R * 0.0829189914716, FILLET2_R * 1.07677918193), (0, 0))
            Line((0, 0), (FILLET2_R * 1.07996711329, 0))
        make_face()
    extrude(amount=5)
    with BuildSketch(Plane(origin=(44.277961342029805, 5, -58.798437881283576), x_dir=(-1, 0, 0), z_dir=(0, -1, 0))) as fillet2_piece_23:
        with BuildLine():
            CenterArc((FILLET2_R * 2.28881546319, -FILLET2_R), FILLET2_R, 90, 132.79827162246954)
            Line((FILLET2_R * 1.55506510308, -FILLET2_R * 1.67941917035), (0, 0))
            Line((0, 0), (FILLET2_R * 2.28881546319, 0))
        make_face()
    extrude(amount=5)
    with BuildSketch(Plane(origin=(10.722038657970216, 5, -58.79843788128357), x_dir=(1, 0, 0), z_dir=(0, -1, 0))) as fillet2_piece_24:
        with BuildLine():
            CenterArc((FILLET2_R * 2.28881546319, FILLET2_R), FILLET2_R, 137.20172837753069, 132.79827162246931)
            Line((FILLET2_R * 1.55506510308, FILLET2_R * 1.67941917035), (0, 0))
            Line((0, 0), (FILLET2_R * 2.28881546319, 0))
        make_face()
    extrude(amount=5)

    # Fillet3
    fillet3_edges = [part.edges().sort_by_distance(p)[0] for p in [
        (19.021093968951533, 2.5, -77.82088055517613),
        (15.40192378864667, 2.5, -76.49999999999997),
        (8.636931828046091, 2.5, -76.49999999999979),
        (25, 2.5, -84.99999999999999),
        (24.37030080054948, 2.5, -82.32547578178495),
        (46.36306817195393, 2.5, -76.49999999999979),
        (39.82842712474623, 2.5, -76.49999999999996),
        (35.802708037897816, 2.5, -77.96925781256621),
        (30.629699199450535, 2.5, -82.32547578178497),
        (30.000000000000004, 2.5, -84.99999999999999),
    ]]
    fillet(fillet3_edges, radius=FILLET3_R)

    # Fillet4: read off the stored shape, not the designer's step
    # Fillet4 outline → Fillet4 (add)
    with BuildSketch(Plane(origin=(0, 0, 0), x_dir=(1, 0, 0), z_dir=(0, 1, 0))):
        with BuildLine():
            ThreePointArc((26, 64.171572875), (25.941465448, 64.20340027), (25.883605898, 64.236438872))
            add(Edge.make_bspline(
                [(25.883605898, 64.236438872), (25.951299470855144, 64.19684521503525), (25.999999993754294, 64.12576050726905), (26, 64.033518938)],
                knots=[0, 0, 0, 0, 0.41302494895751024, 0.41302494895751024, 0.41302494895751024, 0.41302494895751024], degree=3, weights=[1, 0.7966656383445988, 0.6773134410332275, 0.6419434080658863]))
            Line((26, 64.033518938), (26, 64.171572875))
        make_face()
        with BuildLine():
            Line((26, 63.798437881), (26, 64.033518938))
            add(Edge.make_bspline(
                [(26, 64.033518938), (26.000000010159642, 63.88345541796652), (25.88979305843695, 63.79843788128297), (25.764918959, 63.798437881)],
                knots=[0.41302494895751024, 0.41302494895751024, 0.41302494895751024, 0.41302494895751024, 1, 1, 1, 1], degree=3, weights=[0.6419434080658863, 0.591676887946988, 0.7110290852583592, 1]))
            Line((25.764918959, 63.798437881), (26, 63.798437881))
        make_face()
    extrude(amount=FILLET4_DEPTH)

    # Fillet5: read off the stored shape, not the designer's step
    # Fillet5 outline → Fillet5 (add)
    with BuildSketch(Plane(origin=(0, 0, 0), x_dir=(1, 0, 0), z_dir=(0, 1, 0))):
        with BuildLine():
            Line((29, 63.798437881), (29.235081041, 63.798437881))
            add(Edge.make_bspline(
                [(29.235081041, 63.798437881), (29.110206941564474, 63.79843788128234), (28.99999998984096, 63.88345541796577), (29, 64.033518938)],
                knots=[0, 0, 0, 0, 0.5869750510425621, 0.5869750510425621, 0.5869750510425621, 0.5869750510425621], degree=3, weights=[1, 0.7110290852572407, 0.5916768879454284, 0.6419434080645631]))
            Line((29, 64.033518938), (29, 63.798437881))
        make_face()
        with BuildLine():
            Line((29, 64.171572875), (29, 64.033518938))
            add(Edge.make_bspline(
                [(29, 64.033518938), (29.000000006246133, 64.12576050726932), (29.048700529145503, 64.19684521503576), (29.116394102, 64.236438872)],
                knots=[0.5869750510425621, 0.5869750510425621, 0.5869750510425621, 0.5869750510425621, 1, 1, 1, 1], degree=3, weights=[0.6419434080645631, 0.67731344103206, 0.7966656383438724, 1]))
            ThreePointArc((29.116394102, 64.236438872), (29.058534552, 64.20340027), (29, 64.171572875))
        make_face()
    extrude(amount=FILLET5_DEPTH)


solid = part.part
